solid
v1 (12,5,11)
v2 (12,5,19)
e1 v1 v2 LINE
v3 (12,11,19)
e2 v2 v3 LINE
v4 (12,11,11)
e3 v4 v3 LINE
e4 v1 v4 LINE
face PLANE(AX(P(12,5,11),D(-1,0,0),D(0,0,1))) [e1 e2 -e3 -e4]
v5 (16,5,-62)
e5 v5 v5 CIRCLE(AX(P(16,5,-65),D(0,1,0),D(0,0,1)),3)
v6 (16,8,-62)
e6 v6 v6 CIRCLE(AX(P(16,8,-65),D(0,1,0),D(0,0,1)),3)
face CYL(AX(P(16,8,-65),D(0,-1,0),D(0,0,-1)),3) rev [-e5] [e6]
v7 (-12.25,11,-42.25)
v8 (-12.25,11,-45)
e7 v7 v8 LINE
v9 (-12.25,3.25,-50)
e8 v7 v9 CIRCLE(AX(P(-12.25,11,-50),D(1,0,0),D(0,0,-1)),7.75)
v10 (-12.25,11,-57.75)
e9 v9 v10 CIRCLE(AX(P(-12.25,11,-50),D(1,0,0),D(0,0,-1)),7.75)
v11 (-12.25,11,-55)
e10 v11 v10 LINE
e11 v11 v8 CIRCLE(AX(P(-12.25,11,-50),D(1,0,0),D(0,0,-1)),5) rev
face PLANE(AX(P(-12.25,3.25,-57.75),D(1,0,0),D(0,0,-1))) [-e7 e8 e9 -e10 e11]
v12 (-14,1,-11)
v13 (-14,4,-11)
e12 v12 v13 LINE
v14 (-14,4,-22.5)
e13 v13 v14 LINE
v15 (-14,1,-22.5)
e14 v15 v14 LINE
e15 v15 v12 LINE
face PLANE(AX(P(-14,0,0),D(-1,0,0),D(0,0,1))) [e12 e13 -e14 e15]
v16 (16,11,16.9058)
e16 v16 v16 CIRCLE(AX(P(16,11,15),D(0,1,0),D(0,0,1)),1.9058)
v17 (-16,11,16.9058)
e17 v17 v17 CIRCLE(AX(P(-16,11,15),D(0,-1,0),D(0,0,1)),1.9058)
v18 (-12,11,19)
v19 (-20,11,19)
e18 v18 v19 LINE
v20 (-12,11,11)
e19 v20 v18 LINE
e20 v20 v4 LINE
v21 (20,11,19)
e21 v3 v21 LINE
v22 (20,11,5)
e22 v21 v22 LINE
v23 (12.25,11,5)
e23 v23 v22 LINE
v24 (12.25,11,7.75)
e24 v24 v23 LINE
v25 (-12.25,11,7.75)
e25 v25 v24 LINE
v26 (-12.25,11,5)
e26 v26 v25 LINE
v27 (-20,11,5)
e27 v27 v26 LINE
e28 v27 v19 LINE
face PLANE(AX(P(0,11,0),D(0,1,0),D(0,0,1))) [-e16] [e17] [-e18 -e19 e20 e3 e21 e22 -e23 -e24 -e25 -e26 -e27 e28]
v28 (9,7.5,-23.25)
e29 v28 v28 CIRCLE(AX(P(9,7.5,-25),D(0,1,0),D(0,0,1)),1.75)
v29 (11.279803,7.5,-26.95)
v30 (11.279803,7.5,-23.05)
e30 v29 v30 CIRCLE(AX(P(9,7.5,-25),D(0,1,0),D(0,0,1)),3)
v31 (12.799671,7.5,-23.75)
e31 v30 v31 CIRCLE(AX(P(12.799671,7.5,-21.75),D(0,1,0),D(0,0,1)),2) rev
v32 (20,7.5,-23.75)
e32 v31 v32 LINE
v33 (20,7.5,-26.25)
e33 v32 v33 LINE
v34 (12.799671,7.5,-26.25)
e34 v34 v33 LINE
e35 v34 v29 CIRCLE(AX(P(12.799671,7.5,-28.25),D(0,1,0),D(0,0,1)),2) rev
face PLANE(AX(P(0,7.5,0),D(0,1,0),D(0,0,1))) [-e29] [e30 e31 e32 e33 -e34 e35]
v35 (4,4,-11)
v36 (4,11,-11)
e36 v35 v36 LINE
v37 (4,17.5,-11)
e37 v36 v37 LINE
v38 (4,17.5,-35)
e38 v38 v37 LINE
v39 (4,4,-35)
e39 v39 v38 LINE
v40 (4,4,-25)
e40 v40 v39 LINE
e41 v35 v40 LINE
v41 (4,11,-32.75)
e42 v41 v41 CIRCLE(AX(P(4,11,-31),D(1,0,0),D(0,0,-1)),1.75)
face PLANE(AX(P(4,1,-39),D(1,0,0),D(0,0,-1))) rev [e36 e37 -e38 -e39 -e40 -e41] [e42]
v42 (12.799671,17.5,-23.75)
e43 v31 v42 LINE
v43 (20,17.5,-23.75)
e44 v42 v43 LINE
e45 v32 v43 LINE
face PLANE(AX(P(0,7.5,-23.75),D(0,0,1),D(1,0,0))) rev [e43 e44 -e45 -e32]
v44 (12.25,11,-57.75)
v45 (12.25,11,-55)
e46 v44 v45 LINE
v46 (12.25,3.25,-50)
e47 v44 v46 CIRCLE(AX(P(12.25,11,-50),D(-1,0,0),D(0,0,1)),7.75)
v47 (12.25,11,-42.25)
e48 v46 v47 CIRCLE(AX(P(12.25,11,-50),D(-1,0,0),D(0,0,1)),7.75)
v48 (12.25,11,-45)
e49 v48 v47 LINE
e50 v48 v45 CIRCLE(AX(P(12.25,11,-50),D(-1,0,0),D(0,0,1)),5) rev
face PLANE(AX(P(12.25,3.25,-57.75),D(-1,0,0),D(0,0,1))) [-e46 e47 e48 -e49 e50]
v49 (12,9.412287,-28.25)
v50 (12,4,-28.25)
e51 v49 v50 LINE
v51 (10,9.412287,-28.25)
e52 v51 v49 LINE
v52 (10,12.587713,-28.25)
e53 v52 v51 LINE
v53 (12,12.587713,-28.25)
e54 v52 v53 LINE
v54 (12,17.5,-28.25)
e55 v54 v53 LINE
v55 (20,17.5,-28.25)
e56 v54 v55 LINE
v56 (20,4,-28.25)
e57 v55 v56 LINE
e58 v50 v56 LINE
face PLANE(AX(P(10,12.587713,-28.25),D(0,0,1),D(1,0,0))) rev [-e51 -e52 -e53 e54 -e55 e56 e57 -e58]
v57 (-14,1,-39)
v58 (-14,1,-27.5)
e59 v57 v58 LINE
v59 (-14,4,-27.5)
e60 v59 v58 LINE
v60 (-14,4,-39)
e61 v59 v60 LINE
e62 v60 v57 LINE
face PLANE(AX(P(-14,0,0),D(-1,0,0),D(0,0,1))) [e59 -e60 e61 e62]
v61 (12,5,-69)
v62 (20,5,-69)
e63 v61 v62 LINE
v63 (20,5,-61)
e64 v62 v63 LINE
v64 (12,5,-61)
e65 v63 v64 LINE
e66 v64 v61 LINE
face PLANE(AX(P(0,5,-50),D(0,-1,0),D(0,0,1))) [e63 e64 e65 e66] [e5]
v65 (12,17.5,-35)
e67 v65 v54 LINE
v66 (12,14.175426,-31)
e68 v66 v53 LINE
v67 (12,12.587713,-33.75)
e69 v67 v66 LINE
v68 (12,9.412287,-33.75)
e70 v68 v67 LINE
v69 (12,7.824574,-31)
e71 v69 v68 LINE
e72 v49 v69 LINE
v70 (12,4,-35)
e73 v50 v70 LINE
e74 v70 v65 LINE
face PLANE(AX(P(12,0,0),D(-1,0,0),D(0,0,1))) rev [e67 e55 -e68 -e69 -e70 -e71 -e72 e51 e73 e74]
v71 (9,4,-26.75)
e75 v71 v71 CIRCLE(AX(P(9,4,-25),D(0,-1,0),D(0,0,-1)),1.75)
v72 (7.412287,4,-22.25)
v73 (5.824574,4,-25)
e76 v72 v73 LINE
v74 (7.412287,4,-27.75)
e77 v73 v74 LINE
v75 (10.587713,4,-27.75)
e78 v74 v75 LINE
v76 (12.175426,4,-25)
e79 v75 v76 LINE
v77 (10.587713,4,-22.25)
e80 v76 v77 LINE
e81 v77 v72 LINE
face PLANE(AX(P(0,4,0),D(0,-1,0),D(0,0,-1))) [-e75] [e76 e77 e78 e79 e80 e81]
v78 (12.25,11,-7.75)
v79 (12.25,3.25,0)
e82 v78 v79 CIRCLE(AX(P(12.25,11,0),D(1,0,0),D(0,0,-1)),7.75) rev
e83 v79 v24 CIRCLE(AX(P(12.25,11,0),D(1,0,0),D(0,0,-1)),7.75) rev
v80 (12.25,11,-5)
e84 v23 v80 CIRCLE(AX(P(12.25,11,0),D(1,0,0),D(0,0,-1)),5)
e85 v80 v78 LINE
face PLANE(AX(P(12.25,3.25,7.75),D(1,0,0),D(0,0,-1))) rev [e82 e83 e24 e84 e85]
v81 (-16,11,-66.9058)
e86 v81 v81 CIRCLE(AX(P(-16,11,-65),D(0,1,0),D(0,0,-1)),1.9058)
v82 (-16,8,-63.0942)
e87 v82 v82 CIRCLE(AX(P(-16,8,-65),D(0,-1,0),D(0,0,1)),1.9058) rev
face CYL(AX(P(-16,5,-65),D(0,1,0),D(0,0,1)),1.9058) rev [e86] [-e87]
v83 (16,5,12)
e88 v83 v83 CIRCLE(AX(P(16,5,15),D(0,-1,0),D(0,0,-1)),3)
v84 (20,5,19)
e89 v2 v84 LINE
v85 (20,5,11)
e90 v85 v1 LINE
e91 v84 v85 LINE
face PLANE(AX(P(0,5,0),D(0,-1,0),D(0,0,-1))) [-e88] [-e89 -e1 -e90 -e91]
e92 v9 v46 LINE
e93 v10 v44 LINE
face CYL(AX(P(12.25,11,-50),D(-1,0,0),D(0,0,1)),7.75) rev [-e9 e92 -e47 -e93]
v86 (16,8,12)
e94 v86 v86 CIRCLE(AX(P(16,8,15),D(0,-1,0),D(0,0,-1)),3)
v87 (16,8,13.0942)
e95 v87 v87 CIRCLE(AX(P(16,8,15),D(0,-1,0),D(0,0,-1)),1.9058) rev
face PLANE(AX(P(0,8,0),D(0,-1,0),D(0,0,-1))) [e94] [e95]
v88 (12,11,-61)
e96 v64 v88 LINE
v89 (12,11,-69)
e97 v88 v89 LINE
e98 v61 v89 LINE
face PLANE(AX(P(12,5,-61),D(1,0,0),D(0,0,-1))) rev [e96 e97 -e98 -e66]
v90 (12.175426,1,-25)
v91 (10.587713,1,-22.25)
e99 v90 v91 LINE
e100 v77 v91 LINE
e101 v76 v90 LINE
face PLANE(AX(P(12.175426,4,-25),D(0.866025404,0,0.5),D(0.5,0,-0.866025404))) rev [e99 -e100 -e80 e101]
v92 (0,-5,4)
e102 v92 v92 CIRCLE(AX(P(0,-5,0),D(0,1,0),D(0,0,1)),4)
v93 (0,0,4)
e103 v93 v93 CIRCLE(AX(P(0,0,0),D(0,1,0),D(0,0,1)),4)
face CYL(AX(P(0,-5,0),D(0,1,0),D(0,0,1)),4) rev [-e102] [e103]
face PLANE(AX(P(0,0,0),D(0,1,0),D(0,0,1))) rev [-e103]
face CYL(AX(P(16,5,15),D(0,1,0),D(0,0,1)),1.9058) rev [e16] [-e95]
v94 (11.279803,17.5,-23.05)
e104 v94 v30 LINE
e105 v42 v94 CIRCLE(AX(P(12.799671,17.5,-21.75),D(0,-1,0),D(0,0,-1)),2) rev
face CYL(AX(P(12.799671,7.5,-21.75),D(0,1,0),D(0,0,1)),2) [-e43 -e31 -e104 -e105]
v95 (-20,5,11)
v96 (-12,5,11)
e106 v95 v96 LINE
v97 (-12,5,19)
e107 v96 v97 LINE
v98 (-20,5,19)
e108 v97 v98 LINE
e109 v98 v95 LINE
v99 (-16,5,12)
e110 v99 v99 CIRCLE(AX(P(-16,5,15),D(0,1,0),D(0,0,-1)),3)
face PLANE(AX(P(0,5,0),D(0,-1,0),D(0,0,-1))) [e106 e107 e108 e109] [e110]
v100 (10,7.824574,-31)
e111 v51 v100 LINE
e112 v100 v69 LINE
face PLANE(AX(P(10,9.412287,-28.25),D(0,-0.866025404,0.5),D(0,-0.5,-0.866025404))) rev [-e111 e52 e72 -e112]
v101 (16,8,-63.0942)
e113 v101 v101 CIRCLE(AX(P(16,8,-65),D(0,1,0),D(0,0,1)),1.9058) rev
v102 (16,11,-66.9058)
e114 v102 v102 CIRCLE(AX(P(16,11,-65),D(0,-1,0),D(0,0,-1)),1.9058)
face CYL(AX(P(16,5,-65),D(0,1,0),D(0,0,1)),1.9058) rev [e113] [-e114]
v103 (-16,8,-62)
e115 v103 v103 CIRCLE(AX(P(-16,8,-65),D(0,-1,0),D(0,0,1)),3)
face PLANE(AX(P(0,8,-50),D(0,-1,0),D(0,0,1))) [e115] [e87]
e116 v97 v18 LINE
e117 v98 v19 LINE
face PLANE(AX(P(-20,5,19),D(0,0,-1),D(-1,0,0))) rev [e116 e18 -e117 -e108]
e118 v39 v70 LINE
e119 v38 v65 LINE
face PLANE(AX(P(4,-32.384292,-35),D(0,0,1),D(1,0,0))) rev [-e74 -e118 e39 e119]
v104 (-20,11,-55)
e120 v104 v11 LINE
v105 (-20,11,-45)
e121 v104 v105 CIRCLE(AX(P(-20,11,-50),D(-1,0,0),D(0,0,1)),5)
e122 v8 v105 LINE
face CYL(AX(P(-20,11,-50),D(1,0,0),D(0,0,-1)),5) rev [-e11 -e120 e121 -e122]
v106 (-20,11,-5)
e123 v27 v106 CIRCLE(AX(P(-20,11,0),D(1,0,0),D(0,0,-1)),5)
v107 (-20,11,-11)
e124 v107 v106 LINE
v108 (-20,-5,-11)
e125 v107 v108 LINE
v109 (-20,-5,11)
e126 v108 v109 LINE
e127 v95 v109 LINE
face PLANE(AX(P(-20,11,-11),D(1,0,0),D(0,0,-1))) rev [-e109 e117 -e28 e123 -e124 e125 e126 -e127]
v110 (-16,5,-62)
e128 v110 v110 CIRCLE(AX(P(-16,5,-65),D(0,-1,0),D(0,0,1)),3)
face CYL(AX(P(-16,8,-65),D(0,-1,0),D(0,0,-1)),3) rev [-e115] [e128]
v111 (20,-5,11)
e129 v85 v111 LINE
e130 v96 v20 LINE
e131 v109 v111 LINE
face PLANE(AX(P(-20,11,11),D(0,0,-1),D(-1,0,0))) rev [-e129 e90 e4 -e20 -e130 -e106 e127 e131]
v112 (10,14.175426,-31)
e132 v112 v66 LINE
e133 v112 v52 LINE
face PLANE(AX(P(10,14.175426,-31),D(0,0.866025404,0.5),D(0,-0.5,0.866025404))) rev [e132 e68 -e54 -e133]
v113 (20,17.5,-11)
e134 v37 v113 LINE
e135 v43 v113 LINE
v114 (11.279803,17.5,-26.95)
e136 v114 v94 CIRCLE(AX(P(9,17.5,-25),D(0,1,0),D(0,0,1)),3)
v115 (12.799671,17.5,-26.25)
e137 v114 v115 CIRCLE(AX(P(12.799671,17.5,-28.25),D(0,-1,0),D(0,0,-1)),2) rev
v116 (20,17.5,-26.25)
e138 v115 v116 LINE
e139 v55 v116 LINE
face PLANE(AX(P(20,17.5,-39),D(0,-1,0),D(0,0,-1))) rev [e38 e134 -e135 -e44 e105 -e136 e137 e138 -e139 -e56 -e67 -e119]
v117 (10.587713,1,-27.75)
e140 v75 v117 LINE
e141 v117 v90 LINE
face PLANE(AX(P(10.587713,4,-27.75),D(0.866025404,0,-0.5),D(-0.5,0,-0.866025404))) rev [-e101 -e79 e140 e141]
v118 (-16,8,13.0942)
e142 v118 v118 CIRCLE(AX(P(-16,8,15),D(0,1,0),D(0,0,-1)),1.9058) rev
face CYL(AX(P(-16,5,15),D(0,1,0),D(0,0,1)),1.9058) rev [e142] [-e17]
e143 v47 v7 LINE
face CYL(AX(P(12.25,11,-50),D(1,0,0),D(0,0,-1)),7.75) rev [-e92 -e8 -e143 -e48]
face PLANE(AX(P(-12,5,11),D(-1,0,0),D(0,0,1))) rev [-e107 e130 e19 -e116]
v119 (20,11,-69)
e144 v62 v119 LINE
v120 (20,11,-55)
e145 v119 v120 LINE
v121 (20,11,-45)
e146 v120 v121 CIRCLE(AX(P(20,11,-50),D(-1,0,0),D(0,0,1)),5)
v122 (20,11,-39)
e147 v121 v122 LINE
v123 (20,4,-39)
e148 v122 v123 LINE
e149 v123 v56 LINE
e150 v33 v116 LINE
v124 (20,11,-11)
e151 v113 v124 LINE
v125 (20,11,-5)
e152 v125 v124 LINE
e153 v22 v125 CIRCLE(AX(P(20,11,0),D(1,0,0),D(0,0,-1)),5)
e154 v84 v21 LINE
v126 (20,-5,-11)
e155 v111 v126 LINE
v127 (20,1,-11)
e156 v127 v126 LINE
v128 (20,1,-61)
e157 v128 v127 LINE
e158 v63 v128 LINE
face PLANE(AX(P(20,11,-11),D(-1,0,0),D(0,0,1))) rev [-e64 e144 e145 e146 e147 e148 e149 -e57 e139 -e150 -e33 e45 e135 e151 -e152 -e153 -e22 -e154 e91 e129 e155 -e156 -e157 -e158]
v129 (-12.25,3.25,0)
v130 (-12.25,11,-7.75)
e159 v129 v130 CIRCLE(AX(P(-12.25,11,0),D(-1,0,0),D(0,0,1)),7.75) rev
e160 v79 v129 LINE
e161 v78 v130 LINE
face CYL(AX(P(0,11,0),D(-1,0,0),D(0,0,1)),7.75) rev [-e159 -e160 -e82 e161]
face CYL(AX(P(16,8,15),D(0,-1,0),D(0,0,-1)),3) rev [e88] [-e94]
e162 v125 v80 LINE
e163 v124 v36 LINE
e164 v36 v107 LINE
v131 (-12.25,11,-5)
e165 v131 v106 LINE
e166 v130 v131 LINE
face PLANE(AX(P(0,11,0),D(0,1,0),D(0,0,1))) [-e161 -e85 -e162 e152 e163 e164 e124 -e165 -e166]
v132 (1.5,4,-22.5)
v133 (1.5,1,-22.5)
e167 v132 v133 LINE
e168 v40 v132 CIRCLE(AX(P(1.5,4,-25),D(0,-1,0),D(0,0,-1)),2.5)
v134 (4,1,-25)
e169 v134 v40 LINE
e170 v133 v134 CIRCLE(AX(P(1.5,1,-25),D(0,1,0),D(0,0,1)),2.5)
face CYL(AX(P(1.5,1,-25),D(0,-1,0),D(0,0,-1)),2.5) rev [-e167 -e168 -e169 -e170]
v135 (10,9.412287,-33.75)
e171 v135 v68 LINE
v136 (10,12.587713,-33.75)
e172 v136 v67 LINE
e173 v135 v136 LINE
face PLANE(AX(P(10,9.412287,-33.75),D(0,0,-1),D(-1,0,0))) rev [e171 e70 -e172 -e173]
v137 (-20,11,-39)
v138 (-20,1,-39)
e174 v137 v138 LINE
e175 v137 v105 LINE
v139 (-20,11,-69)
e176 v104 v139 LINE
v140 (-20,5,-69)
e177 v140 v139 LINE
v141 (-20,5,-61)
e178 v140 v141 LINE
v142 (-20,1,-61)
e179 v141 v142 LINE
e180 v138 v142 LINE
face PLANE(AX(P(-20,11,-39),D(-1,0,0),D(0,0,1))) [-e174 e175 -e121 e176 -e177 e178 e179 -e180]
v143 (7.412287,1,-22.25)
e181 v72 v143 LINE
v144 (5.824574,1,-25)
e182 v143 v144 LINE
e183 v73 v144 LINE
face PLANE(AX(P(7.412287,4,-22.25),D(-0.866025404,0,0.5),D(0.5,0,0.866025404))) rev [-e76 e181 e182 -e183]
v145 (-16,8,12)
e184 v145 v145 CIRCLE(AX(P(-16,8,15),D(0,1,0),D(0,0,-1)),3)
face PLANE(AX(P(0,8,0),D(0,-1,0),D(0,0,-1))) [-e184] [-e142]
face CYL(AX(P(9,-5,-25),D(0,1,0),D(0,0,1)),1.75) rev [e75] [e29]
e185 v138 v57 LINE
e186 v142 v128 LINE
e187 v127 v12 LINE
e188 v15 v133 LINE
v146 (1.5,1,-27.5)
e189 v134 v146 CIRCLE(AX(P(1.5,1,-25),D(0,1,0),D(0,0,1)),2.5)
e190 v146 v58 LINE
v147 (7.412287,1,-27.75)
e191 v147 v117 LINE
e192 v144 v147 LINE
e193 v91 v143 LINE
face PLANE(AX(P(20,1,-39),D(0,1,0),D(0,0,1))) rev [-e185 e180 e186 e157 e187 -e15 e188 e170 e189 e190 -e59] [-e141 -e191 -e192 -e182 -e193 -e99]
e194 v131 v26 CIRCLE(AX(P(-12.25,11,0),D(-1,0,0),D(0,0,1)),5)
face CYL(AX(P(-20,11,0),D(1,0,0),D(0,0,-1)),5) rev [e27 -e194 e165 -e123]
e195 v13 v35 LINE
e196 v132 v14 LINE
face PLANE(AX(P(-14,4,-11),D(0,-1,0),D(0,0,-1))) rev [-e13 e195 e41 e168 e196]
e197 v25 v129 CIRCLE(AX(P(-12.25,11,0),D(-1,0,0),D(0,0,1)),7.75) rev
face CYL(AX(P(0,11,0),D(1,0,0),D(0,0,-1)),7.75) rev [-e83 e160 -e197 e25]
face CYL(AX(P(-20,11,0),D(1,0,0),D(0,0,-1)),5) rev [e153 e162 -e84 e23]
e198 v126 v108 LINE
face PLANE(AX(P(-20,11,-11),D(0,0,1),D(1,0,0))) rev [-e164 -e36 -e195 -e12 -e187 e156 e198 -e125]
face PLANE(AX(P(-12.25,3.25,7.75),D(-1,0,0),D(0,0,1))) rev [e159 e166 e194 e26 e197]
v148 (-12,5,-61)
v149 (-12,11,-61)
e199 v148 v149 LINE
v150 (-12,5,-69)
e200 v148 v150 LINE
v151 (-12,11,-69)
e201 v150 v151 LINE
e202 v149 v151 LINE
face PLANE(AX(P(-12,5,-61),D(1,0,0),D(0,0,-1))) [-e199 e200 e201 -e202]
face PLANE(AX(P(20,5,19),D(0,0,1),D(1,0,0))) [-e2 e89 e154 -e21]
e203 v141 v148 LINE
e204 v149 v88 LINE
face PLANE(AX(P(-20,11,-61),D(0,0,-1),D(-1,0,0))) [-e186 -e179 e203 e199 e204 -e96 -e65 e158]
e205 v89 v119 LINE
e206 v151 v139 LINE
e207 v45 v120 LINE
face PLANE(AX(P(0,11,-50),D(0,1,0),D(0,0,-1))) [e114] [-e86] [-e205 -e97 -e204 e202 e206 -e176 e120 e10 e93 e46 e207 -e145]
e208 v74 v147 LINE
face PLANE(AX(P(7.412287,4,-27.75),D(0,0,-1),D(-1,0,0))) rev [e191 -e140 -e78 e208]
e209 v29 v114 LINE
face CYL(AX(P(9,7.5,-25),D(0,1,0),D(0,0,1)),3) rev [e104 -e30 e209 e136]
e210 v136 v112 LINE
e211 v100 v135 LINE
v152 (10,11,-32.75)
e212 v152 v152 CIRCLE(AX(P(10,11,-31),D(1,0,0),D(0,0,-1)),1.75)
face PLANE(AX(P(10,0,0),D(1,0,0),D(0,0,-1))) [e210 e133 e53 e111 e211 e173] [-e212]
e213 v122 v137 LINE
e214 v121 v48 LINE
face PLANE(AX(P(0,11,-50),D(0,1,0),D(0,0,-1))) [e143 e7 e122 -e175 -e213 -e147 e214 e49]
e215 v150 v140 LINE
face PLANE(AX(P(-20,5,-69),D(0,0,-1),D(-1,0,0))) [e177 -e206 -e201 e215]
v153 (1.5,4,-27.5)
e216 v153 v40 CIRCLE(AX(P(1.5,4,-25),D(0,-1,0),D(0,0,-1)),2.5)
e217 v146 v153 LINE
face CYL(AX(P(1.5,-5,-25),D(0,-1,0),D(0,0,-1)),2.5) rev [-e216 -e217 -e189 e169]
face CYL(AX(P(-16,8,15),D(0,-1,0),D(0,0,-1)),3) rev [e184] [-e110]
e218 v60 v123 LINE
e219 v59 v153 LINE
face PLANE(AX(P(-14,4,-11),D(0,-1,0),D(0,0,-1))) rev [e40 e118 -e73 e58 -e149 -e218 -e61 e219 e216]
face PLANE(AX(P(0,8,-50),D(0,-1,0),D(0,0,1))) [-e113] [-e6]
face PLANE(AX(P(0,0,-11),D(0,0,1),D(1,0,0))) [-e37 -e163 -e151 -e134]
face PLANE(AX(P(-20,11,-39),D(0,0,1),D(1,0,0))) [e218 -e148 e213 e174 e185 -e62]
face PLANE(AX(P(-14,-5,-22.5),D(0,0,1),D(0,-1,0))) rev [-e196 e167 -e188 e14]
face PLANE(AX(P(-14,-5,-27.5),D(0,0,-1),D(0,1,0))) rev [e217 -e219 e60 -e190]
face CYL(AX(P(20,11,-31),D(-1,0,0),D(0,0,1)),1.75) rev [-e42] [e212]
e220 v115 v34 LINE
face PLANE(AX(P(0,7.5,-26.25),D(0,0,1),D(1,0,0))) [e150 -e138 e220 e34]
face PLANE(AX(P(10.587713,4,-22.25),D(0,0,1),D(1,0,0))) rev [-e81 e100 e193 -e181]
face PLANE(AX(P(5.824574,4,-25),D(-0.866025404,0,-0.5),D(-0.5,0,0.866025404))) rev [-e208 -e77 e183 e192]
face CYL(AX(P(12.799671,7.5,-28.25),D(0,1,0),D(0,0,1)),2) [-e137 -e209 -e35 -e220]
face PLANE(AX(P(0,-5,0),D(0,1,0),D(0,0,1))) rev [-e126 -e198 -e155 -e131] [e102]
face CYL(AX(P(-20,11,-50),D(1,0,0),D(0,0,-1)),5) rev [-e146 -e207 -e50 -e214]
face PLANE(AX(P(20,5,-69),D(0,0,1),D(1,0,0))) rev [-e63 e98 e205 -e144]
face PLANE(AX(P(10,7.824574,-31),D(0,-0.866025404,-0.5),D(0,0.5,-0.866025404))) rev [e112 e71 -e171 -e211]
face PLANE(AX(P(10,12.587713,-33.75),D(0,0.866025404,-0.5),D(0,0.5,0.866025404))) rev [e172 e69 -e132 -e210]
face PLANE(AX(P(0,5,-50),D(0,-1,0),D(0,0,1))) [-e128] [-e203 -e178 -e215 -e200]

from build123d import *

# Parameters (mm, degrees)
SKETCH1_W                  = 40
SKETCH1_H                  = 22
BOSS_EXTRUDE1_DEPTH        = 11
SKETCH2_W                  = 40
SKETCH2_H                  = 22
SKETCH2_R                  = 4
BOSS_EXTRUDE2_DEPTH        = 5
SKETCH3_W                  = 24.5
SKETCH3_H                  = 15.5
CUT_EXTRUDE1_DEPTH         = 7.75
FILLET1_R                  = 7.75
SKETCH4_R                  = 5
CUT_EXTRUDE2_DEPTH         = 36.805900352
SKETCH5_W                  = 8
SKETCH5_H                  = 8
SKETCH5_R                  = 1.905800151
BOSS_EXTRUDE3_DEPTH        = 6
CUT_EXTRUDE3_START         = -3
SKETCH6_R                  = 3
SKETCH6_R_2                = 1.905800151
CUT_EXTRUDE3_DEPTH         = 3
SKETCH7_W                  = 16
SKETCH7_H                  = 16.5
BOSS_EXTRUDE5_DEPTH        = 28
MIRROR14_COPY_1_SKETCH_W   = 8
MIRROR14_COPY_1_SKETCH_H   = 8
MIRROR14_COPY_1_SKETCH_R   = 1.905800151
MIRROR14_COPY_1_DEPTH      = 6
MIRROR14_START             = -3
MIRROR14_COPY_2_SKETCH_R   = 3
MIRROR14_COPY_2_SKETCH_R_2 = 1.905800151
MIRROR14_COPY_2_DEPTH      = 3
FILLET1_OF_MIRROR14_R      = 7.75
SKETCH9_W                  = 28
SKETCH9_H                  = 3
BOSS_EXTRUDE6_DEPTH        = 18
CUT_EXTRUDE4_DEPTH         = 10
CUT_EXTRUDE5_DEPTH         = 73.919476136
CUT_EXTRUDE5_DEPTH_BACK    = 73.919476136
SKETCH11_R                 = 1.75
CUT_EXTRUDE6_DEPTH         = 76.121568141
CUT_EXTRUDE6_DEPTH_BACK    = 76.121568141
SKETCH12_R                 = 1.75
FILLET2_R                  = 2
CUT_EXTRUDE12_START        = -3
SKETCH17_R                 = 1.75
CUT_EXTRUDE12_DEPTH        = 3
CUT_EXTRUDE13_DEPTH        = 74.097537578
CUT_EXTRUDE13_DEPTH_BACK   = 74.097537578
SKETCH18_W                 = 18
SKETCH18_H                 = 5
FILLET3_R                  = 2.5
CUT_EXTRUDE14_DEPTH        = 74.710582687
CUT_EXTRUDE15_START        = -10
SKETCH21_R                 = 1.75
CUT_EXTRUDE15_DEPTH        = 10
SKETCH20_W                 = 36.163748027
SKETCH20_H                 = 4
CUT_EXTRUDE16_DEPTH        = 13.5
SKETCH22_W                 = 6.75
SKETCH22_H                 = 13.5
CUT_EXTRUDE18_DEPTH        = 8


with BuildPart() as part:
    # Sketch1 → Boss-Extrude1 (new body)
    with BuildSketch(Plane(origin=(0, 0, 0), x_dir=(1, 0, 0), z_dir=(0, 1, 0))):
        Rectangle(SKETCH1_W, SKETCH1_H)
    boss_extrude1 = extrude(amount=BOSS_EXTRUDE1_DEPTH)

    # Sketch2 → Boss-Extrude2 (add)
    with BuildSketch(Plane(origin=(0, 0, 0), x_dir=(1, 0, 0), z_dir=(0, 1, 0))):
        Rectangle(SKETCH2_W, SKETCH2_H)
        with Locations(Location((0, 0, 0), (0, 0, 270))):
            Circle(SKETCH2_R, mode=Mode.SUBTRACT)
    boss_extrude2 = extrude(amount=-BOSS_EXTRUDE2_DEPTH)

    # Sketch3 → Cut-Extrude1 (cut)
    with BuildSketch(Plane(origin=(0, 11, 0), x_dir=(1, 0, 0), z_dir=(0, 1, 0))):
        Rectangle(SKETCH3_W, SKETCH3_H)
    cut_extrude1 = extrude(amount=-CUT_EXTRUDE1_DEPTH, mode=Mode.SUBTRACT)

    # Fillet1
    fillet1_edges = [part.edges().sort_by_distance(p)[0] for p in [
        (0, 3.25, 7.75),
        (0, 3.25, -7.75),
    ]]
    fillet(fillet1_edges, radius=FILLET1_R - 0.0001)  # a hair under: the kernel refuses the full size

    # Sketch4 → Cut-Extrude2 (cut, symmetric)
    with BuildSketch(Plane(origin=(-12.25, 0, 0), x_dir=(0, 0, -1), z_dir=(1, 0, 0))):
        with Locations((0, 11)):
            Circle(SKETCH4_R)
    cut_extrude2 = extrude(amount=CUT_EXTRUDE2_DEPTH, both=True, mode=Mode.SUBTRACT)

    # Sketch5 → Boss-Extrude3 (add)
    with BuildSketch(Plane(origin=(0, 11, 0), x_dir=(1, 0, 0), z_dir=(0, 1, 0))):
        with Locations((16, -15)):
            Rectangle(SKETCH5_W, SKETCH5_H)
        with Locations(Location((16, -15, 0), (0, 0, 270))):
            Circle(SKETCH5_R, mode=Mode.SUBTRACT)
    boss_extrude3 = extrude(amount=-BOSS_EXTRUDE3_DEPTH)

    # Sketch6 → Cut-Extrude3 (cut)
    with BuildSketch(Plane.XZ.offset(-5).offset(CUT_EXTRUDE3_START)):
        with Locations(Location((16, 15, 0), (0, 0, 270))):
            Circle(SKETCH6_R)
        with Locations(Location((16, 15, 0), (0, 0, 90))):
            Circle(SKETCH6_R_2, mode=Mode.SUBTRACT)
    cut_extrude3 = extrude(amount=CUT_EXTRUDE3_DEPTH, mode=Mode.SUBTRACT)

    # Mirror8: Boss-Extrude3, Cut-Extrude3 across plane
    add(boss_extrude3.mirror(Plane(origin=(0, 0, 0), x_dir=(0, 0, 1), z_dir=(1, 0, 0))))
    add(cut_extrude3.mirror(Plane(origin=(0, 0, 0), x_dir=(0, 0, 1), z_dir=(1, 0, 0))), mode=Mode.SUBTRACT)

    # Sketch7 → Boss-Extrude5 (add)
    with BuildSketch(Plane(origin=(0, 0, -11), x_dir=(-1, 0, 0), z_dir=(0, 0, -1))):
        with Locations((-12, 9.25)):
            Rectangle(SKETCH7_W, SKETCH7_H)
    extrude(amount=BOSS_EXTRUDE5_DEPTH)

    # Mirror14: Boss-Extrude1, Boss-Extrude2, Cut-Extrude1, Cut-Extrude2, Boss-Extrude3, Cut-Extrude3 across plane
    add(boss_extrude1.mirror(Plane.XY.offset(-25)))
    add(boss_extrude2.mirror(Plane.XY.offset(-25)))
    add(cut_extrude1.mirror(Plane.XY.offset(-25)), mode=Mode.SUBTRACT)
    add(cut_extrude2.mirror(Plane.XY.offset(-25)), mode=Mode.SUBTRACT)
    add(boss_extrude3.mirror(Plane.XY.offset(-25)))
    add(cut_extrude3.mirror(Plane.XY.offset(-25)), mode=Mode.SUBTRACT)

    # Mirror14 copy 1 sketch → Mirror14 copy 1 (add)
    with BuildSketch(Plane(origin=(0, 11, -50), x_dir=(-1, 0, 0), z_dir=(0, 1, 0))):
        with Locations((16, -15)):
            Rectangle(MIRROR14_COPY_1_SKETCH_W, MIRROR14_COPY_1_SKETCH_H)
        with Locations(Location((16, -15, 0), (0, 0, 270))):
            Circle(MIRROR14_COPY_1_SKETCH_R, mode=Mode.SUBTRACT)
    extrude(amount=-MIRROR14_COPY_1_DEPTH)

    # Mirror14 copy 2 sketch → Mirror14 copy 2 (cut)
    with BuildSketch(Plane(origin=(0, 5, -50), x_dir=(-1, 0, 0), z_dir=(0, -1, 0)).offset(MIRROR14_START)):
        with Locations(Location((16, 15, 0), (0, 0, 270))):
            Circle(MIRROR14_COPY_2_SKETCH_R)
        with Locations(Location((16, 15, 0), (0, 0, 90))):
            Circle(MIRROR14_COPY_2_SKETCH_R_2, mode=Mode.SUBTRACT)
    extrude(amount=MIRROR14_COPY_2_DEPTH, mode=Mode.SUBTRACT)

    # Fillet1 of Mirror14
    fillet1_of_mirror14_edges = [part.edges().sort_by_distance(p)[0] for p in [
        (0, 3.25, -57.75),
        (0, 3.25, -42.25),
    ]]
    fillet(fillet1_of_mirror14_edges, radius=FILLET1_OF_MIRROR14_R - 0.0001)  # a hair under: the kernel refuses the full size

    # Sketch9 → Boss-Extrude6 (add)
    with BuildSketch(Plane.ZY.offset(-4)):
        with Locations((-25, 2.5)):
            Rectangle(SKETCH9_W, SKETCH9_H)
    extrude(amount=BOSS_EXTRUDE6_DEPTH)

    # Sketch10 → Cut-Extrude4 (cut)
    with BuildSketch(Plane(origin=(0, 17.5, 0), x_dir=(1, 0, 0), z_dir=(0, 1, 0))):
        with BuildLine():
            Line((9, 26.25), (9, 23.75))
            Line((9, 23.75), (11.727178029, 23.75))
            ThreePointArc((11.727178029, 23.75), (11.931001031, 24.360286817), (12, 25))
            ThreePointArc((12, 25), (11.931001031, 25.639713183), (11.727178029, 26.25))
            Line((11.727178029, 26.25), (9, 26.25))
        make_face()
        with BuildLine():
            Line((11.727178029, 23.75), (9, 23.75))
            Line((9, 23.75), (9, 26.25))
            Line((9, 26.25), (11.727178029, 26.25))
            ThreePointArc((11.727178029, 26.25), (6, 25), (11.727178029, 23.75))
        make_face()
        with BuildLine():
            ThreePointArc((12, 25), (11.931001031, 24.360286817), (11.727178029, 23.75))
            Line((11.727178029, 23.75), (20, 23.75))
            Line((20, 23.75), (20, 26.25))
            Line((20, 26.25), (11.727178029, 26.25))
            ThreePointArc((11.727178029, 26.25), (11.931001031, 25.639713183), (12, 25))
        make_face()
    extrude(amount=-CUT_EXTRUDE4_DEPTH, mode=Mode.SUBTRACT)

    # Sketch11 → Cut-Extrude5 (cut, two sides: drawn at the far end of the back side and taken through both)
    with BuildSketch(Plane(origin=(0, 7.5, 0), x_dir=(1, 0, 0), z_dir=(0, 1, 0)).offset(-CUT_EXTRUDE5_DEPTH_BACK)):
        with Locations(Location((9, 25, 0), (0, 0, 270))):
            Circle(SKETCH11_R)
    extrude(amount=CUT_EXTRUDE5_DEPTH + CUT_EXTRUDE5_DEPTH_BACK, mode=Mode.SUBTRACT)

    # Sketch12 → Cut-Extrude6 (cut, two sides: drawn at the far end of the back side and taken through both)
    with BuildSketch(Plane.ZY.offset(-4).offset(-CUT_EXTRUDE6_DEPTH_BACK)):
        with Locations((-31, 11)):
            Circle(SKETCH12_R)
    extrude(amount=CUT_EXTRUDE6_DEPTH + CUT_EXTRUDE6_DEPTH_BACK, mode=Mode.SUBTRACT)

    # Fillet2
    fillet2_edges = [part.edges().sort_by_distance(p)[0] for p in [
        (11.727178029, 12.5, -23.75),
        (11.727178029, 12.5, -26.25),
    ]]
    fillet(fillet2_edges, radius=FILLET2_R)

    # Sketch17 → Cut-Extrude12 (cut)
    with BuildSketch(Plane.XZ.offset(-1).offset(CUT_EXTRUDE12_START)):
        Polygon((12.175426481, -25), (10.58771324, -22.25), (7.41228676, -22.25), (5.824573519, -25), (7.41228676, -27.75), (10.58771324, -27.75), align=None)
        with Locations(Location((9, -25, 0), (0, 0, 90))):
            Circle(SKETCH17_R, mode=Mode.SUBTRACT)
    extrude(amount=CUT_EXTRUDE12_DEPTH, mode=Mode.SUBTRACT)

    # Sketch18 → Cut-Extrude13 (cut, two sides: drawn at the far end of the back side and taken through both)
    with BuildSketch(Plane(origin=(0, 4, 0), x_dir=(1, 0, 0), z_dir=(0, 1, 0)).offset(-CUT_EXTRUDE13_DEPTH_BACK)):
        with Locations((-5, 25)):
            Rectangle(SKETCH18_W, SKETCH18_H)
    extrude(amount=CUT_EXTRUDE13_DEPTH + CUT_EXTRUDE13_DEPTH_BACK, mode=Mode.SUBTRACT)

    # Fillet3
    fillet3_edges = [part.edges().sort_by_distance(p)[0] for p in [
        (4, 2.5, -27.5),
        (4, 2.5, -22.5),
    ]]
    fillet(fillet3_edges, radius=FILLET3_R - 0.0001)  # a hair under: the kernel refuses the full size

    # Sketch19 → Cut-Extrude14 (cut, through all)
    with BuildSketch(Plane.XZ.offset(-1)):
        Polygon((20, -61), (20, -39), (-14, -39), (-20, -39), (-20, -61), align=None)
    extrude(amount=CUT_EXTRUDE14_DEPTH, mode=Mode.SUBTRACT)

    # Sketch21 → Cut-Extrude15 (cut)
    with BuildSketch(Plane(origin=(20, 0, 0), x_dir=(0, 0, -1), z_dir=(1, 0, 0)).offset(CUT_EXTRUDE15_START)):
        Polygon((31, 14.175426481), (28.25, 12.58771324), (28.25, 9.41228676), (31, 7.824573519), (33.75, 9.41228676), (33.75, 12.58771324), align=None)
        with Locations((31, 11)):
            Circle(SKETCH21_R, mode=Mode.SUBTRACT)
    extrude(amount=CUT_EXTRUDE15_DEPTH, mode=Mode.SUBTRACT)

    # Sketch20 → Cut-Extrude16 (cut)
    with BuildSketch(Plane(origin=(0, 17.5, 0), x_dir=(1, 0, 0), z_dir=(0, 1, 0))):
        with Locations((22.081874014, 37)):
            Rectangle(SKETCH20_W, SKETCH20_H)
    extrude(amount=-CUT_EXTRUDE16_DEPTH, mode=Mode.SUBTRACT)

    # Sketch22 → Cut-Extrude18 (cut)
    with BuildSketch(Plane(origin=(20, 0, 0), x_dir=(0, 0, -1), z_dir=(1, 0, 0))):
        with Locations((31.625, 10.75)):
            Rectangle(SKETCH22_W, SKETCH22_H)
    extrude(amount=-CUT_EXTRUDE18_DEPTH, mode=Mode.SUBTRACT)


solid = part.part
